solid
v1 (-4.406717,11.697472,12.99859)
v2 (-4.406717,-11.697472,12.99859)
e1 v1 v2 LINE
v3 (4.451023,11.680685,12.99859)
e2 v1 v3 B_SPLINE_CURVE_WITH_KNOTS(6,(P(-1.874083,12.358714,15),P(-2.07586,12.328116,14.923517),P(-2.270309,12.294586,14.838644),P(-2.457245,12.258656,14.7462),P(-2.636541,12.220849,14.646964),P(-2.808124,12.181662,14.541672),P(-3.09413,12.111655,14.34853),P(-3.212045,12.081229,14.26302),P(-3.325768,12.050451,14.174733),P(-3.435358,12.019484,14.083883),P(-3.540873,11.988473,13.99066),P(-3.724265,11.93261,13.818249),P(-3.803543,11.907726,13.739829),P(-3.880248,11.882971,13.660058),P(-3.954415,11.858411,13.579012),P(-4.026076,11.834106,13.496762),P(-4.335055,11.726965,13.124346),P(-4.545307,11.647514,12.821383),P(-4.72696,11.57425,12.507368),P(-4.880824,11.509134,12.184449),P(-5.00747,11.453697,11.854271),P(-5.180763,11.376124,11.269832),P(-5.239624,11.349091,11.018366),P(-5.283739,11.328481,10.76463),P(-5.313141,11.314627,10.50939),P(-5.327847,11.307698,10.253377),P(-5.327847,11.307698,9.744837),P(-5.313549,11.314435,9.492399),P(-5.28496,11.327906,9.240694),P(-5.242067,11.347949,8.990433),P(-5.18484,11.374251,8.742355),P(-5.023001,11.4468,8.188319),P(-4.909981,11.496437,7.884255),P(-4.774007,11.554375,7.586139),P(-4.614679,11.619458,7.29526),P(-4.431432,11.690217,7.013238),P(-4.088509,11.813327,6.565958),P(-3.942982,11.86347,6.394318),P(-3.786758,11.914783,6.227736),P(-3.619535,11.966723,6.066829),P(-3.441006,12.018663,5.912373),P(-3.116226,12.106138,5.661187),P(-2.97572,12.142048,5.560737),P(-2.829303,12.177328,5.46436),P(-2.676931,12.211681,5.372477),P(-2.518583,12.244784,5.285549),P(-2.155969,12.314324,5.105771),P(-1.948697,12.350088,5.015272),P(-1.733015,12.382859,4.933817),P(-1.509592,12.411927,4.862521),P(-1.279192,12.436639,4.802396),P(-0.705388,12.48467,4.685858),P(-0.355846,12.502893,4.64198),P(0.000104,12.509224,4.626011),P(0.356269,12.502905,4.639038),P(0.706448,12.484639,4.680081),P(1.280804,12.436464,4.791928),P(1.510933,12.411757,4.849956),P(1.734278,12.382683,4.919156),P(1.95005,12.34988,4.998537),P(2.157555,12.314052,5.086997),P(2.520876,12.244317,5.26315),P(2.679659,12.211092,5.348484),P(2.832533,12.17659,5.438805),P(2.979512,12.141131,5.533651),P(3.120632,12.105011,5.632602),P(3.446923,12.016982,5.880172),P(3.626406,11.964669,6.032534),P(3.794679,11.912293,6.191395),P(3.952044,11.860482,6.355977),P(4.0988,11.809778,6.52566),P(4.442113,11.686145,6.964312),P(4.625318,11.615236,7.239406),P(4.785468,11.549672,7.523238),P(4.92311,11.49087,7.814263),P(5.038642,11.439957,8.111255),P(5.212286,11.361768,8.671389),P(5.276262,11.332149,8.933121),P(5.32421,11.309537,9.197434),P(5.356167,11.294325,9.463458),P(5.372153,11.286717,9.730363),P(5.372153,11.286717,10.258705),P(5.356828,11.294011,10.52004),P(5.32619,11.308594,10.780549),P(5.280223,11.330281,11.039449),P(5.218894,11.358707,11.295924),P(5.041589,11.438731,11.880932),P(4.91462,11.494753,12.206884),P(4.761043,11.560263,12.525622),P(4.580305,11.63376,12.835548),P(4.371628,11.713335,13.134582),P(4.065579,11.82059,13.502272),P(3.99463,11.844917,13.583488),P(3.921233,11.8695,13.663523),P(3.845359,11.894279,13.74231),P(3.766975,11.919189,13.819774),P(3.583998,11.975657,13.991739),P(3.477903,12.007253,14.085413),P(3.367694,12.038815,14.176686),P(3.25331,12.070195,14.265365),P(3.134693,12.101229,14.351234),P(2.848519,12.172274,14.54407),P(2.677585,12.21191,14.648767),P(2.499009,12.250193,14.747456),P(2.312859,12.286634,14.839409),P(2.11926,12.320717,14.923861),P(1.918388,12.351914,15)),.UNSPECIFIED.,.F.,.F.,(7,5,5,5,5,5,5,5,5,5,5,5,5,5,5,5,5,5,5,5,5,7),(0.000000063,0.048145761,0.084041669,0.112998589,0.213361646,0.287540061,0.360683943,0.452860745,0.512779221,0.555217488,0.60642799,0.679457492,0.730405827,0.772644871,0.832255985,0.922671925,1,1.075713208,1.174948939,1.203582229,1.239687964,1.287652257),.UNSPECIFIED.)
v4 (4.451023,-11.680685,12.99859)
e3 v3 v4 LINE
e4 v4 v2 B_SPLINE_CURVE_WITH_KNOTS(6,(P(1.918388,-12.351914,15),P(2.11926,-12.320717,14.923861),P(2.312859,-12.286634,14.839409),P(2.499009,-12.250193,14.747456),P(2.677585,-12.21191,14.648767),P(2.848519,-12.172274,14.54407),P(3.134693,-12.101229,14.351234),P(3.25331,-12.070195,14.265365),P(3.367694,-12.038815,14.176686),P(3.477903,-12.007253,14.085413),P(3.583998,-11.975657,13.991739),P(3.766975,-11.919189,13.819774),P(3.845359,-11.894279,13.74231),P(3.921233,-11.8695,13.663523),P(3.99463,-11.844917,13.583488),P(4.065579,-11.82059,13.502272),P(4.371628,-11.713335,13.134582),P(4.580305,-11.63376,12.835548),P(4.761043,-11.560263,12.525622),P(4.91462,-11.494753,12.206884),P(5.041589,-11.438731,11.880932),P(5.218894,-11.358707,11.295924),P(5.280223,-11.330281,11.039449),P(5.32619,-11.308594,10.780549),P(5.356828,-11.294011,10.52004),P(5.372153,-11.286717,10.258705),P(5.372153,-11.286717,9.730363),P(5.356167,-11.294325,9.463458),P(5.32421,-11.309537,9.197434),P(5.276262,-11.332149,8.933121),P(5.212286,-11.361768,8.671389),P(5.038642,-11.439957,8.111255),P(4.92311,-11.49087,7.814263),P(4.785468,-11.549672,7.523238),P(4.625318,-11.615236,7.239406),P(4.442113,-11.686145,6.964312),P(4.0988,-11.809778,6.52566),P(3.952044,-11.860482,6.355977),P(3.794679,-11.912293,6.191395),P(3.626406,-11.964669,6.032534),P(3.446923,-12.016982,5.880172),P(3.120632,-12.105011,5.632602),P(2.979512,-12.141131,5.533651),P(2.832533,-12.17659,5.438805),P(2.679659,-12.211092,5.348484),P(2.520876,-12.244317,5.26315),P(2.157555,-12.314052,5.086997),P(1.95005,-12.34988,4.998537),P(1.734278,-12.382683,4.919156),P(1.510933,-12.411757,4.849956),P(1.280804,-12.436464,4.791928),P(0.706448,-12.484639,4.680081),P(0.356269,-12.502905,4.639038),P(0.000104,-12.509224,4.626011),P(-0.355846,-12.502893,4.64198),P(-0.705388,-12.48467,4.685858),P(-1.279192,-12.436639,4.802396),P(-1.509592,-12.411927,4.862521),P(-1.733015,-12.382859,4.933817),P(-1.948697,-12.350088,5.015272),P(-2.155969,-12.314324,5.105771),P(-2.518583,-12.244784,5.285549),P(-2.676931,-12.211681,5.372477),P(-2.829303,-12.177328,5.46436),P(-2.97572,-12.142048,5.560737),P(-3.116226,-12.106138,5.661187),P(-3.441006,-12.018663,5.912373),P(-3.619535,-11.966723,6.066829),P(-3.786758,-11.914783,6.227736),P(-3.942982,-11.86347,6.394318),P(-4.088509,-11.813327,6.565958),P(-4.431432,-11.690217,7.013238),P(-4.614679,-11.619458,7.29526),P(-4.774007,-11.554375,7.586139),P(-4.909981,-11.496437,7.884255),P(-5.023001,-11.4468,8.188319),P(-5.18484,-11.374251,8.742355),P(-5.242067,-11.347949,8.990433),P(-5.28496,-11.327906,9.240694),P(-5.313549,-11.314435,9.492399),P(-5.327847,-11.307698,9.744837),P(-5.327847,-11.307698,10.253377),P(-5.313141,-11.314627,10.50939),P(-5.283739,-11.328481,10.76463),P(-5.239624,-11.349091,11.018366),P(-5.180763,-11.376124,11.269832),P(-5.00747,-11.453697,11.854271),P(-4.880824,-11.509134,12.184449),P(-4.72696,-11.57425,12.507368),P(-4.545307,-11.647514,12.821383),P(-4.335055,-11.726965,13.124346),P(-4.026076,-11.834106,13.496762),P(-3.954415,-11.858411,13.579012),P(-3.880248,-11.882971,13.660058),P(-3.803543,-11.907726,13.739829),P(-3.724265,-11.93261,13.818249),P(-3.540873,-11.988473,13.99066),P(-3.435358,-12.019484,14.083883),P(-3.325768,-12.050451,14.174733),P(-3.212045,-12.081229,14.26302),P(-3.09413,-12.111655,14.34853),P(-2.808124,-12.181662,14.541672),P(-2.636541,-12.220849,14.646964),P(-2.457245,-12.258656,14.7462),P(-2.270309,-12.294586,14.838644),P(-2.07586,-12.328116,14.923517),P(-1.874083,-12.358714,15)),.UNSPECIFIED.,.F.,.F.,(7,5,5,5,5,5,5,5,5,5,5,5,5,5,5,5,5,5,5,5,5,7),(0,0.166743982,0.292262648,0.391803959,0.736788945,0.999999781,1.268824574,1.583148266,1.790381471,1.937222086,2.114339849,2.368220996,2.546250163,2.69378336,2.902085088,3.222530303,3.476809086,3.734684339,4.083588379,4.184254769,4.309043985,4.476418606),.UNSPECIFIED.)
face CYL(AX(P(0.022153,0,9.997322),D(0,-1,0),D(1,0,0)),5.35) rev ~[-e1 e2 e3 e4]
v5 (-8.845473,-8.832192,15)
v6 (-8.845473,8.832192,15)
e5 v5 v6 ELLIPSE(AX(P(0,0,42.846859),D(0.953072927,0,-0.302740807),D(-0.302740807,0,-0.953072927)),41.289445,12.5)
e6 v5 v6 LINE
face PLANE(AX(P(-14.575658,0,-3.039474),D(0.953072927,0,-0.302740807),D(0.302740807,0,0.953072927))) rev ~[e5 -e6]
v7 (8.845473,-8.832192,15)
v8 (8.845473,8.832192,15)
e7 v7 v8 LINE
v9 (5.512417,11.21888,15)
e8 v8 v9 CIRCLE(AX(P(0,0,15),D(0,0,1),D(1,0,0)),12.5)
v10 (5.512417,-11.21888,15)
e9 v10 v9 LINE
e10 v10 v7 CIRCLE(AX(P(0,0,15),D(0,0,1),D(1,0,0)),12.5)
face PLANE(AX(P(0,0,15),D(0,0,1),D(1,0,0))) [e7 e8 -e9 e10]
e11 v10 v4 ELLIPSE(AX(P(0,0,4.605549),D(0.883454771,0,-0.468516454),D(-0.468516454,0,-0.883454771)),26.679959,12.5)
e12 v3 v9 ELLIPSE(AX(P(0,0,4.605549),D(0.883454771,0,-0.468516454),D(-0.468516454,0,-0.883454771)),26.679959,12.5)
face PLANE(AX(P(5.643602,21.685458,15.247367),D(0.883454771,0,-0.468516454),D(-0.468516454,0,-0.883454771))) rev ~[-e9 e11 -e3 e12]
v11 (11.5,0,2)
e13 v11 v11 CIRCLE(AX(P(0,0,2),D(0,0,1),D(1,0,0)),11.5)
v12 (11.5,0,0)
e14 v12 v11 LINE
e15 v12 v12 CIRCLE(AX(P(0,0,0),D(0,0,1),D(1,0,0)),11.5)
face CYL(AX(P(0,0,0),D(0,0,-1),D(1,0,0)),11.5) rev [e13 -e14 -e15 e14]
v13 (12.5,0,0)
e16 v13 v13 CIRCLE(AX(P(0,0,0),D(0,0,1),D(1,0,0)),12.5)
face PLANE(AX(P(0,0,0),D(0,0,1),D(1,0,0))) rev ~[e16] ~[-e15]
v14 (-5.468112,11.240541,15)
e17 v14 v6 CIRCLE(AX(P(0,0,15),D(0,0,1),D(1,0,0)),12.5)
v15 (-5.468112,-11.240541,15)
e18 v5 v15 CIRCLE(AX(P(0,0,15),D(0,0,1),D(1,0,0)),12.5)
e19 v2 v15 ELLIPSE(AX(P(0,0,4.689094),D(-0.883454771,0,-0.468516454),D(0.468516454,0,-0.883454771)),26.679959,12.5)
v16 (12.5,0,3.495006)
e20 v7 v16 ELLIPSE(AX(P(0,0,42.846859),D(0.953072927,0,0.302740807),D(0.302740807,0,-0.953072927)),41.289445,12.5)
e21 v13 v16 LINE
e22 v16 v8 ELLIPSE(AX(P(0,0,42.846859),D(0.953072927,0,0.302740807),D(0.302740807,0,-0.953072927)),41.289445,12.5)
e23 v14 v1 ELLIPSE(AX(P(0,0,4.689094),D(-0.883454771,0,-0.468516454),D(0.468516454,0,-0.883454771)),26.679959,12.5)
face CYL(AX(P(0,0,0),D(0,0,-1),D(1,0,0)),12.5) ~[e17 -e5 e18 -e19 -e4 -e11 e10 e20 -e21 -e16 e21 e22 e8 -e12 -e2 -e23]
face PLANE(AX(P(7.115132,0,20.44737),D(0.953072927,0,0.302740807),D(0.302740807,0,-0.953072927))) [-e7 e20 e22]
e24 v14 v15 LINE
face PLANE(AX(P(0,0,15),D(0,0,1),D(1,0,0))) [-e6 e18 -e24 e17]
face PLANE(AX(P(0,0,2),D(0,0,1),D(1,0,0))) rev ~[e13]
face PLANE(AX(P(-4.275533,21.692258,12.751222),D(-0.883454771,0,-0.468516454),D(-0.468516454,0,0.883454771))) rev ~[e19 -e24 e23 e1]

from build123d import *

# Parameters (mm, degrees)
F0_R        = 12.5
F1_DEPTH    = 15
F2_R        = 5.35
F3_DEPTH    = 19.7
F4_R        = 11.5
F5_DEPTH    = 2
F6_T1_DEPTH = 43.3845163924
F6_T3_DEPTH = 43.3709168199
F8_DEPTH    = 41


# Not quite as in the source:
# - a fillet or chamfer that OpenCascade refuses, or shapes differently, is made with other operations: its cross-section is extruded or revolved along the edge and cut away or added


with BuildPart() as f1:
    # F0 (on Top) → F1 (new body)
    with BuildSketch(Plane.XY):
        Circle(F0_R)
    extrude(amount=F1_DEPTH)

    # F2 (on Front) → F3 (cut, symmetric)
    with BuildSketch(Plane.XZ):
        with Locations((0.0221527088, 9.997321542)):
            Circle(F2_R)
    extrude(amount=F3_DEPTH, both=True, mode=Mode.SUBTRACT)

    # F4 (on Top) → F5 (cut)
    with BuildSketch(Plane.XY):
        Circle(F4_R)
    extrude(amount=F5_DEPTH, mode=Mode.SUBTRACT)

    # F6: chamfer of 7 on 2 edges, made by hand

    # F6_s2 → F6_t1 (cut)
    with BuildSketch(Plane.XZ.offset(-21.6922581962)):
        with BuildLine():
            Line((-4.2755328164, 12.7512221633), (-5.5992962087, 15.2473673359))
            Line((-5.5992962087, 15.2473673359), (-5.5992962087, 15.3873673359))
            ThreePointArc((-5.5992962087, 15.3873673359), (-3.7366893911, 15.14), (-1.8740825735, 15.14))
            Line((-1.8740825735, 15.14), (-1.8244614633, 14.869088788))
            ThreePointArc((-1.8244614633, 14.869088788), (-3.2288770936, 14.0685504994), (-4.1596371494, 12.6726843102))
            Line((-4.1596371494, 12.6726843102), (-4.2755328164, 12.7512221633))
        make_face()
    extrude(amount=F6_T1_DEPTH, mode=Mode.SUBTRACT)

    # F6_s4 → F6_t3 (cut)
    with BuildSketch(Plane.XZ.offset(-21.6854584099)):
        with BuildLine():
            Line((5.6436016264, 15.2473673359), (4.3198382341, 12.7512221633))
            Line((4.3198382341, 12.7512221633), (4.2039425671, 12.6726843102))
            ThreePointArc((4.2039425671, 12.6726843102), (3.2731825113, 14.0685504994), (1.868766881, 14.869088788))
            Line((1.868766881, 14.869088788), (1.9183879912, 15.14))
            ThreePointArc((1.9183879912, 15.14), (3.7809948088, 15.14), (5.6436016264, 15.3873673359))
            Line((5.6436016264, 15.3873673359), (5.6436016264, 15.2473673359))
        make_face()
    extrude(amount=F6_T3_DEPTH, mode=Mode.SUBTRACT)

    # F7 (on Front) → F8 (cut, symmetric)
    with BuildSketch(Plane.XZ):
        Polygon((22.090458405, 20.6357296556), (7.1151317097, 20.4473696649), (14.5756583661, -3.0394739006), align=None)
        Polygon((-14.5756583661, -3.0394739006), (-7.1151317097, 20.4473696649), (-22.090458405, 20.6357296556), align=None)
    extrude(amount=F8_DEPTH, both=True, mode=Mode.SUBTRACT)


solid = f1.part
